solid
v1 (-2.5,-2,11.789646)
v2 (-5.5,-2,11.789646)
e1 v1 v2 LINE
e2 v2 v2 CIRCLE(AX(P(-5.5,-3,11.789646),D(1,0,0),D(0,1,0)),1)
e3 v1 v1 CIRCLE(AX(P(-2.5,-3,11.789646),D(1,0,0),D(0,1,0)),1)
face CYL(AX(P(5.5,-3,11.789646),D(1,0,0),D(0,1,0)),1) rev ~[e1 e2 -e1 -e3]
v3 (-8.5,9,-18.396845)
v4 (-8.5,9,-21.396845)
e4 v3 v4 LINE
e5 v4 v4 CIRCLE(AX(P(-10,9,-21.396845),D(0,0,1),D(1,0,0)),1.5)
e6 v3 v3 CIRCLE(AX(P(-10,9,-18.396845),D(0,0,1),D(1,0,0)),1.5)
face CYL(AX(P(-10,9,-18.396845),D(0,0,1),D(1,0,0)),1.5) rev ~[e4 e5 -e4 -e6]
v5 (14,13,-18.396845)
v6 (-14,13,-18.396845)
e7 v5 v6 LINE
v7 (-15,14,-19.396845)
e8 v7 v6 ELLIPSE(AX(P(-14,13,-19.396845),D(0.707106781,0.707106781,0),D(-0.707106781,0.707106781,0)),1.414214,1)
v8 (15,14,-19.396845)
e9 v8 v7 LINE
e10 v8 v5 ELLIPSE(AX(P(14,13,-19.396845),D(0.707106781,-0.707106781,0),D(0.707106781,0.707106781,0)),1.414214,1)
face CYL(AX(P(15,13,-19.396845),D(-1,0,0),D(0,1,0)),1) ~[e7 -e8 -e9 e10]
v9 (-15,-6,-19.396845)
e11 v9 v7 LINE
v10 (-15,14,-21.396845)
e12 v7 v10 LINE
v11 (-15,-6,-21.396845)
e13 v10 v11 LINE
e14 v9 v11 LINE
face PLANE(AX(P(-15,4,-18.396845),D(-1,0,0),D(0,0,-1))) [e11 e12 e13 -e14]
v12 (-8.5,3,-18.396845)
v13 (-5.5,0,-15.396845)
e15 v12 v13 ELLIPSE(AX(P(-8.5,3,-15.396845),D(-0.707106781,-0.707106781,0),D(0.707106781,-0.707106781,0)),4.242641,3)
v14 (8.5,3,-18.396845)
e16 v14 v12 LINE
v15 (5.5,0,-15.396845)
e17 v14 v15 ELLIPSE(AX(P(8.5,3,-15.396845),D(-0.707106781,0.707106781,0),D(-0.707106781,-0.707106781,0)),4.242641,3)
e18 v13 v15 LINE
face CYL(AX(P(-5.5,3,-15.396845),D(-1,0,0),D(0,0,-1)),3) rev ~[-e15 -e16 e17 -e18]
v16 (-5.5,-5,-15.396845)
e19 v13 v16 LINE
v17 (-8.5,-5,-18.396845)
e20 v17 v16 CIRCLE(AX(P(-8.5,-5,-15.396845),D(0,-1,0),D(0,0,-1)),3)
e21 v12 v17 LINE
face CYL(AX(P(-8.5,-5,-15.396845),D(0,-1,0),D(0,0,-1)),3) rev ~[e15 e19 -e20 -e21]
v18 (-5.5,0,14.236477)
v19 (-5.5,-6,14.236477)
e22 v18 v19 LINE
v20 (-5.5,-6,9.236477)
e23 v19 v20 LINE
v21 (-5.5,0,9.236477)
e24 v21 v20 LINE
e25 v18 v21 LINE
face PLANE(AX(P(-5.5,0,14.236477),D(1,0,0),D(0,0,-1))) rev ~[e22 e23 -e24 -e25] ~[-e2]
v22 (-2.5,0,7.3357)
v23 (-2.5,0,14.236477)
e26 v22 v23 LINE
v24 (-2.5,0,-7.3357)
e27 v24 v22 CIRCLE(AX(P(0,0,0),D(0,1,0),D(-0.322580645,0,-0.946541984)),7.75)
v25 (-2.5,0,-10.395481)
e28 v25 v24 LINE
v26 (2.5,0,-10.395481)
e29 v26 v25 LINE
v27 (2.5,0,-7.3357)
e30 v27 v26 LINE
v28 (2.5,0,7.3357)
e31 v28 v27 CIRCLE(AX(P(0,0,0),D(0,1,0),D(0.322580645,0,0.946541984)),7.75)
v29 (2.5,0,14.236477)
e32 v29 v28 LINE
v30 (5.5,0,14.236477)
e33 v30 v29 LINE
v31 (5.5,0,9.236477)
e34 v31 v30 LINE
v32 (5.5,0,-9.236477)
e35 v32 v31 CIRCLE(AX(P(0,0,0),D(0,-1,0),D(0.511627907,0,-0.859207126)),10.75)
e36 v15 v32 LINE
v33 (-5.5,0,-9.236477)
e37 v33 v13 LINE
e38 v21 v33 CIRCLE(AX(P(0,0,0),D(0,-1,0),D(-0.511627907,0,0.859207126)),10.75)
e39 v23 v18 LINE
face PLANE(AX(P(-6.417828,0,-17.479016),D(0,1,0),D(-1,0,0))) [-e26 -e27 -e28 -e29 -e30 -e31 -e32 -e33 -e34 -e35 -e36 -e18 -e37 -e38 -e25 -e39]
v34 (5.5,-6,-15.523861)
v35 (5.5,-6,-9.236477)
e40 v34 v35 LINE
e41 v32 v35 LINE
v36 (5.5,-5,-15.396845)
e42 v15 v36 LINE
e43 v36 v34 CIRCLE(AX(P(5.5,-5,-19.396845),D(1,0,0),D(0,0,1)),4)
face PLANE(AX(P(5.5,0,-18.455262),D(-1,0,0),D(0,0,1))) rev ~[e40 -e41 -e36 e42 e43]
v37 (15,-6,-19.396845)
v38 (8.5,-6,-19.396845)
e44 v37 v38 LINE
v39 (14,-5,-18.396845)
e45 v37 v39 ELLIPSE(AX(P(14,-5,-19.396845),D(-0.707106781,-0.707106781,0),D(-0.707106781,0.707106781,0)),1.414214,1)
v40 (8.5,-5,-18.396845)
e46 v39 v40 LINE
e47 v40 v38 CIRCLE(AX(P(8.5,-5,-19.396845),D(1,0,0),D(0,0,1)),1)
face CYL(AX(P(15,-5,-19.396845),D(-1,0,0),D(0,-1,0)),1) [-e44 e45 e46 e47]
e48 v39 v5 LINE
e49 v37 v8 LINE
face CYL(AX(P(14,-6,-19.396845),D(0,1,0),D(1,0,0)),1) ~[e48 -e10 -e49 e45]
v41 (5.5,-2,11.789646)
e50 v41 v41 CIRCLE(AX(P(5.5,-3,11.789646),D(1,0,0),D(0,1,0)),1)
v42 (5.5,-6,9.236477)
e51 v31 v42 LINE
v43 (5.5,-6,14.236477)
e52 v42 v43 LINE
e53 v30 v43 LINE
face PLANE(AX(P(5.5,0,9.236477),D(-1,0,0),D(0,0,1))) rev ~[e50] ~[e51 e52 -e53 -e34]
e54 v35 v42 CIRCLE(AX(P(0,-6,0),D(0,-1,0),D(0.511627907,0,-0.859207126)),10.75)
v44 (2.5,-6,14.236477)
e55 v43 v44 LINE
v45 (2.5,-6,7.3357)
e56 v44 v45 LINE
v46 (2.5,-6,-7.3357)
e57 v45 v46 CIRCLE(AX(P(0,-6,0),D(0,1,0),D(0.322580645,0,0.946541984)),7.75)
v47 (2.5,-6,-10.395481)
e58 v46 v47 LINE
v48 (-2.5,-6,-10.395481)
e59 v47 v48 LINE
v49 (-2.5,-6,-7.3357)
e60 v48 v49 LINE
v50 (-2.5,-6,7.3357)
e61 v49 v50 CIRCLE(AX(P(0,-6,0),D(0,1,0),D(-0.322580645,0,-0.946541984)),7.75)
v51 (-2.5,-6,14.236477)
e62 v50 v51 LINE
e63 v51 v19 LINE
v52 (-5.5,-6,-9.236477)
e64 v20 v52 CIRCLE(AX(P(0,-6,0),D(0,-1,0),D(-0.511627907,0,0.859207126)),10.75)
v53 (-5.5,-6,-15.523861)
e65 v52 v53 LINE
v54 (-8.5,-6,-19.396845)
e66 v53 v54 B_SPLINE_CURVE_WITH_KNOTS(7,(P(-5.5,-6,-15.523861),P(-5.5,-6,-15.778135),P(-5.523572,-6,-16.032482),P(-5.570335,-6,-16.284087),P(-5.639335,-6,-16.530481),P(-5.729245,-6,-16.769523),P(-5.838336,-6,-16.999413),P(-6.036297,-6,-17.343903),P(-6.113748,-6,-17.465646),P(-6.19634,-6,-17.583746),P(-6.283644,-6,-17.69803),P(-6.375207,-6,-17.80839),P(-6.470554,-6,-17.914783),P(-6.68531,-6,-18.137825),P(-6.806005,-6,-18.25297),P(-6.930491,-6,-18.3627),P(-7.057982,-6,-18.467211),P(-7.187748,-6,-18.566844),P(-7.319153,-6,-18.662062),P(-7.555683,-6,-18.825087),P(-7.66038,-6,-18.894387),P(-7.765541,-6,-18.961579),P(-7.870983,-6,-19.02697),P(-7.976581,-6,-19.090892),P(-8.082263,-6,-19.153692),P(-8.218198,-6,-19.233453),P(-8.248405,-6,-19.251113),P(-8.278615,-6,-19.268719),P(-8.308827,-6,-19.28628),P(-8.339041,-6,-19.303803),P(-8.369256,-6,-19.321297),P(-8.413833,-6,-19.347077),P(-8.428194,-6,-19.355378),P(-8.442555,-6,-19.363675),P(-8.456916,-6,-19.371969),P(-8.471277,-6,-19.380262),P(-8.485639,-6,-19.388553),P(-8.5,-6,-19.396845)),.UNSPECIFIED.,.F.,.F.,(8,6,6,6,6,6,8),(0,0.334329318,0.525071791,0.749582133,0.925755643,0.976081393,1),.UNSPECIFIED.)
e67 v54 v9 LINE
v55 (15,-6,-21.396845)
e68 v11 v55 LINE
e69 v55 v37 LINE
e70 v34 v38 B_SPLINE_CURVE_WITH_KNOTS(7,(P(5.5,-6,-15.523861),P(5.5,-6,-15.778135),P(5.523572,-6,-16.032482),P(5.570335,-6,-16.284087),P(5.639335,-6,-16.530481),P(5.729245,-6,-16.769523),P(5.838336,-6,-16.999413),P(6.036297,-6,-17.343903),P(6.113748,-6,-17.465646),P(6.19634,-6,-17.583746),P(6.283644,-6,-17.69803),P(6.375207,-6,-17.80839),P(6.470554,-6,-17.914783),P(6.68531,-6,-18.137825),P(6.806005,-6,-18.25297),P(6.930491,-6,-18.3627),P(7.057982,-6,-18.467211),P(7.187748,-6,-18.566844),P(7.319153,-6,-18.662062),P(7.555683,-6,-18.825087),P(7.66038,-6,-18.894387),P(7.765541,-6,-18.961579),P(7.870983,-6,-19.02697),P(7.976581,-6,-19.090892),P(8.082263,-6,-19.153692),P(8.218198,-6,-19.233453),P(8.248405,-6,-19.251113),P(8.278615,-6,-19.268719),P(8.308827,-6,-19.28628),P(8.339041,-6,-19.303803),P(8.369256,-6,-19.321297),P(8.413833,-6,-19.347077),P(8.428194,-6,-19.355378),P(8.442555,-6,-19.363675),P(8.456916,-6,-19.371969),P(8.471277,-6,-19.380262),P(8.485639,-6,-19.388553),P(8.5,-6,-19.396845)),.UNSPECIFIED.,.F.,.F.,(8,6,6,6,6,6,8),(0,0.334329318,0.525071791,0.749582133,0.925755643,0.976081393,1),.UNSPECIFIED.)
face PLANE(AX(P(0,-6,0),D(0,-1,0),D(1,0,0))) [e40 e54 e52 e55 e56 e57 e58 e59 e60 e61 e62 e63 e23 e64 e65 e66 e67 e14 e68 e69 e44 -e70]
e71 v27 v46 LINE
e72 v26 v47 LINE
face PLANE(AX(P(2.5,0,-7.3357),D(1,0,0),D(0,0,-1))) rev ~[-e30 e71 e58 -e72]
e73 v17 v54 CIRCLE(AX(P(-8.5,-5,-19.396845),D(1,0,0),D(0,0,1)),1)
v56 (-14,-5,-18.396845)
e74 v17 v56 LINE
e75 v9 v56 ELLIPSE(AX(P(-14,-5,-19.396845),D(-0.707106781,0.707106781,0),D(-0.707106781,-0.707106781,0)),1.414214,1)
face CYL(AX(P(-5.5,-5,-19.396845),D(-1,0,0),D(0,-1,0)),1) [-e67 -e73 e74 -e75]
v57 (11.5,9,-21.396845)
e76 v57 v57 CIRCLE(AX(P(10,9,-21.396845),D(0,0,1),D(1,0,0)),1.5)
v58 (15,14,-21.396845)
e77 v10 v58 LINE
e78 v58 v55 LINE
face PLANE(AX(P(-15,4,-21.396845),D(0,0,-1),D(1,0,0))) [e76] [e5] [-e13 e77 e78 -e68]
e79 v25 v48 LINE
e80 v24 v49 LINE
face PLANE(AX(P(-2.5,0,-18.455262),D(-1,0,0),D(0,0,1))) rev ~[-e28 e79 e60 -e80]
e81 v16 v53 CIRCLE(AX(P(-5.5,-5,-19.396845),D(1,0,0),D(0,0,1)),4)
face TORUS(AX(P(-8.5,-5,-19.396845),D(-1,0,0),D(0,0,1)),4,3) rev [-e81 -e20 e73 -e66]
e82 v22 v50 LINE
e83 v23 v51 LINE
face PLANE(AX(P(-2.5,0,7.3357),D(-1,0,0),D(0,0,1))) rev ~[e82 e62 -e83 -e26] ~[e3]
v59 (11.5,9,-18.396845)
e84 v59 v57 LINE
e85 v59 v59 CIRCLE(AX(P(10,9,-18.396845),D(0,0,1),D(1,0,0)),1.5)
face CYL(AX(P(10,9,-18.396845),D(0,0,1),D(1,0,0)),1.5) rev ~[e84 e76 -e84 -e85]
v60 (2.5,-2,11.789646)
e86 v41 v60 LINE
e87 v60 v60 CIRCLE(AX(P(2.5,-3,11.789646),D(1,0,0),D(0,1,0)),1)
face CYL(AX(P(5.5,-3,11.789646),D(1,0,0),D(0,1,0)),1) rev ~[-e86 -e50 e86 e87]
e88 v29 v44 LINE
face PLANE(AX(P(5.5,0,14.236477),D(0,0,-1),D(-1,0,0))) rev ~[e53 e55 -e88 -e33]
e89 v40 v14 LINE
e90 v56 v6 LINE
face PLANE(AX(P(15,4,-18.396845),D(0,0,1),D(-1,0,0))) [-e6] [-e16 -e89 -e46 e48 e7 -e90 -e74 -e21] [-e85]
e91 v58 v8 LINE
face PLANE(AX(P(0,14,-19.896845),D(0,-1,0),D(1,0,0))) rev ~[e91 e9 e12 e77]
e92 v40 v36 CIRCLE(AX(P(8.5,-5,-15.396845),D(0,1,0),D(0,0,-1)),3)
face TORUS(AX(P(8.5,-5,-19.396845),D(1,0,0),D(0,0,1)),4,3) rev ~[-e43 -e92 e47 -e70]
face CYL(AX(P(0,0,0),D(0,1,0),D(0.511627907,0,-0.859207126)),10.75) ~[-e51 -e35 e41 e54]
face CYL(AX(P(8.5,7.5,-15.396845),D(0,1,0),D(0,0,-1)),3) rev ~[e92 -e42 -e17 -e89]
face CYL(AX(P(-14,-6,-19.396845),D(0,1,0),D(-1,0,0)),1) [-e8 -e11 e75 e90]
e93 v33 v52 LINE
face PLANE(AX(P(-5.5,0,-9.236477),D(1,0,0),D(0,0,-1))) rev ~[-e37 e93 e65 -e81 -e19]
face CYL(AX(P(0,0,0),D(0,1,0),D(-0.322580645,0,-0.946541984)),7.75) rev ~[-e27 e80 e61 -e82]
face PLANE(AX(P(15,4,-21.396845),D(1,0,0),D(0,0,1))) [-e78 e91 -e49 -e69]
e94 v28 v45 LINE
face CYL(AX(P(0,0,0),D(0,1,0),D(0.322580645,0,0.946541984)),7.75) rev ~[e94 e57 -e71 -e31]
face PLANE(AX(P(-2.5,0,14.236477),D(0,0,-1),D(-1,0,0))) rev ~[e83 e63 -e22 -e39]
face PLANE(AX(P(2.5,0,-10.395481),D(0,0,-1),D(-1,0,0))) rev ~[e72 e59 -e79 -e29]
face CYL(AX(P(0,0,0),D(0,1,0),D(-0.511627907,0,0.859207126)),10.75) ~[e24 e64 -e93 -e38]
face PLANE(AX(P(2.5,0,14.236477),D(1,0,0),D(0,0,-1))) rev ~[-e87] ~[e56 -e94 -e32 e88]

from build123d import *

# Parameters (mm, degrees)
F1_DEPTH      = 6
F2_R          = 1
F3_DEPTH      = 25
F5_DEPTH      = 6
F6_DEPTH      = 10
F11_R         = 1
F12_T1_DEPTH  = 5
F12_T3_DEPTH  = 11
F12_T8_ANGLE  = 359.64
F12_T14_ANGLE = 359.64
F12_T21_DEPTH = 12.5
F12_T25_DEPTH = 18.5
F12_T32_DEPTH = 18.5
F12_T36_DEPTH = 12.5
F13_R         = 1.5
F14_DEPTH     = 25


# Not quite as in the source:
# - a fillet or chamfer that OpenCascade refuses, or shapes differently, is made with other operations: its cross-section is extruded or revolved along the edge and cut away or added


with BuildPart() as f1:
    # F0 (on Front) → F1 (new body)
    with BuildSketch(Plane.XZ):
        with BuildLine():
            Line((2.5, -7.3357003756), (2.5, -18.4552618332))
            Line((2.5, -18.4552618332), (5.5, -18.4552618332))
            Line((5.5, -18.4552618332), (5.5, -9.236476601))
            ThreePointArc((5.5, -9.236476601), (10.75, 0), (5.5, 9.236476601))
            Line((5.5, 9.236476601), (5.5, 14.236476601))
            Line((5.5, 14.236476601), (2.5, 14.236476601))
            Line((2.5, 14.236476601), (2.5, 7.3357003756))
            ThreePointArc((2.5, 7.3357003756), (7.75, 0), (2.5, -7.3357003756))
        make_face()
    extrude(amount=F1_DEPTH)


with BuildPart() as f1b:
    # F0 (on Front) → F1, piece 2 (new body)
    with BuildSketch(Plane.XZ):
        with BuildLine():
            ThreePointArc((-2.5, -7.3357003756), (-7.75, 0), (-2.5, 7.3357003756))
            Line((-2.5, 7.3357003756), (-2.5, 14.236476601))
            Line((-2.5, 14.236476601), (-5.5, 14.236476601))
            Line((-5.5, 14.236476601), (-5.5, 9.236476601))
            ThreePointArc((-5.5, 9.236476601), (-10.75, 0), (-5.5, -9.236476601))
            Line((-5.5, -9.236476601), (-5.5, -18.4552618332))
            Line((-5.5, -18.4552618332), (-2.5, -18.4552618332))
            Line((-2.5, -18.4552618332), (-2.5, -7.3357003756))
        make_face()
    extrude(amount=F1_DEPTH)


with BuildPart() as f3_tool:
    # F2 (on face) → F3 (new body)
    with BuildSketch(Plane.YZ.offset(5.5)):
        with Locations((-3, 11.7896459997)):
            Circle(F2_R)
    extrude(amount=-F3_DEPTH)


with BuildPart() as f1_1:
    add(f1.part)

    # F3: cut by f3_tool
    add(f3_tool.part, mode=Mode.SUBTRACT)


with BuildPart() as f1b_1:
    add(f1b.part)

    # F3: cut by f3_tool
    add(f3_tool.part, mode=Mode.SUBTRACT)


with BuildPart() as f5:
    # F4 (on Front) → F5 (new body)
    with BuildSketch(Plane.XZ):
        Polygon((2.5, -12.8954811044), (-2.5, -12.8954811044), (-2.5, -18.4552618332), (-2.5, -20.8968445659), (2.5, -20.8968445659), (2.5, -18.4552618332), align=None)
    extrude(amount=F5_DEPTH)


with BuildPart() as f6:
    # F4 (on Front) → F6 (new body, symmetric)
    with BuildSketch(Plane.XZ):
        Polygon((2.5, -20.8968445659), (-2.5, -20.8968445659), (-15, -20.8968445659), (-15, -23.8968445659), (15, -23.8968445659), (15, -20.8968445659), align=None)
    extrude(amount=F6_DEPTH, both=True)


with BuildPart() as f6_1:
    # F7: moved
    add(f6.part.moved(Location((0, 0, 2.5))))


with BuildPart() as f5_1:
    # F7: moved
    add(f5.part.moved(Location((0, 0, 2.5))))


with BuildPart() as f6_2:
    # F8: moved
    add(f6_1.part.moved(Location((0, 4, 0))))


with BuildPart() as f5_2:
    add(f5_1.part)

    # F9: union F6
    add(f6_2.part)

    # F10: union F1, F1b
    add(f1_1.part)
    add(f1b_1.part)

    # F11
    f11_edges = [f5_2.edges().sort_by_distance(p)[0] for p in [
        (-10.25, -6, -18.396845),
        (10.25, -6, -18.396845),
        (15, 4, -18.396845),
        (0, 14, -18.396845),
        (-15, 4, -18.396845),
    ]]
    fillet(f11_edges, radius=F11_R)

    # F12: fillet of radius 3 on 7 edges, made by hand

    # F12_s2 → F12_t1 (join)
    with BuildSketch(Plane.XZ):
        with BuildLine():
            ThreePointArc((-8.5, -18.3968445659), (-6.3786796564, -17.5181649094), (-5.5, -15.3968445659))
            Line((-5.5, -15.3968445659), (-5.5, -18.3968445659))
            Line((-5.5, -18.3968445659), (-8.5, -18.3968445659))
        make_face()
        with BuildLine():
            ThreePointArc((8.5, -18.3968445659), (6.3786796564, -17.5181649094), (5.5, -15.3968445659))
            Line((5.5, -15.3968445659), (5.5, -18.3968445659))
            Line((5.5, -18.3968445659), (8.5, -18.3968445659))
        make_face()
    extrude(amount=F12_T1_DEPTH)

    # F12_s4 → F12_t3 (join)
    with BuildSketch(Plane.YZ.offset(-5.5)):
        with BuildLine():
            ThreePointArc((3, -18.3968445659), (0.8786796564, -17.5181649094), (0, -15.3968445659))
            Line((0, -15.3968445659), (0, -18.3968445659))
            Line((0, -18.3968445659), (3, -18.3968445659))
        make_face()
    extrude(amount=F12_T3_DEPTH)


with BuildPart() as f12_tool6:
    # F12_s7 → F12_t8 (revolve)
    with BuildSketch(Plane.XZ.offset(5)):
        with BuildLine():
            ThreePointArc((-8.5, -18.3968445659), (-6.3786796564, -17.5181649094), (-5.5, -15.3968445659))
            Line((-5.5, -15.3968445659), (-5.5, -18.3968445659))
            Line((-5.5, -18.3968445659), (-8.5, -18.3968445659))
        make_face()
    revolve(axis=Axis((-5.5, -5, -19.3968445659), (1, 0, 0)), revolution_arc=F12_T8_ANGLE)

    split(bisect_by=Plane.XZ.offset(6), keep=Keep.BOTTOM)

    split(bisect_by=Plane.XY.offset(-21.3968445659), keep=Keep.TOP)


with BuildPart() as f5_3:
    add(f5_2.part)

    # F12_t5: union F12_tool6
    add(f12_tool6.part)


with BuildPart() as f12_tool12:
    # F12_s13 → F12_t14 (revolve)
    with BuildSketch(Plane.XZ.offset(5)):
        with BuildLine():
            ThreePointArc((8.5, -18.3968445659), (6.3786796564, -17.5181649094), (5.5, -15.3968445659))
            Line((5.5, -15.3968445659), (5.5, -18.3968445659))
            Line((5.5, -18.3968445659), (8.5, -18.3968445659))
        make_face()
    revolve(axis=Axis((5.5, -5, -19.3968445659), (1, 0, 0)), revolution_arc=F12_T14_ANGLE)

    split(bisect_by=Plane.XZ.offset(6), keep=Keep.BOTTOM)

    split(bisect_by=Plane.XY.offset(-21.3968445659), keep=Keep.TOP)


with BuildPart() as f5_4:
    add(f5_3.part)

    # F12_t11: union F12_tool12
    add(f12_tool12.part)


with BuildPart() as f12_tool19:
    # F12_s20 → F12_t21 (new body)
    with BuildSketch(Plane.XZ.offset(5)):
        with BuildLine():
            ThreePointArc((-8.5, -18.3968445659), (-6.3786796564, -17.5181649094), (-5.5, -15.3968445659))
            Line((-5.5, -15.3968445659), (-5.5, -18.3968445659))
            Line((-5.5, -18.3968445659), (-8.5, -18.3968445659))
        make_face()
    extrude(amount=-F12_T21_DEPTH)

    split(bisect_by=Plane.XZ, keep=Keep.BOTTOM)


with BuildPart() as f12_tool23:
    # F12_s24 → F12_t25 (new body)
    with BuildSketch(Plane.YZ.offset(-13)):
        with BuildLine():
            ThreePointArc((3, -18.3968445659), (0.8786796564, -17.5181649094), (0, -15.3968445659))
            Line((0, -15.3968445659), (0, -18.3968445659))
            Line((0, -18.3968445659), (3, -18.3968445659))
        make_face()
    extrude(amount=F12_T25_DEPTH)

    split(bisect_by=Plane.YZ.offset(-5.5), keep=Keep.BOTTOM)


with BuildPart() as f12_tool19_1:
    add(f12_tool19.part)

    # F12_t27: intersect F12_tool23
    add(f12_tool23.part, mode=Mode.INTERSECT)


with BuildPart() as f5_5:
    add(f5_4.part)

    # F12_t17: union F12_tool19
    add(f12_tool19_1.part)


with BuildPart() as f12_tool30:
    # F12_s31 → F12_t32 (new body)
    with BuildSketch(Plane.YZ.offset(-5.5)):
        with BuildLine():
            ThreePointArc((3, -18.3968445659), (0.8786796564, -17.5181649094), (0, -15.3968445659))
            Line((0, -15.3968445659), (0, -18.3968445659))
            Line((0, -18.3968445659), (3, -18.3968445659))
        make_face()
    extrude(amount=F12_T32_DEPTH)

    split(bisect_by=Plane.YZ.offset(5.5), keep=Keep.TOP)


with BuildPart() as f12_tool34:
    # F12_s35 → F12_t36 (new body)
    with BuildSketch(Plane.XZ.offset(-7.5)):
        with BuildLine():
            ThreePointArc((8.5, -18.3968445659), (6.3786796564, -17.5181649094), (5.5, -15.3968445659))
            Line((5.5, -15.3968445659), (5.5, -18.3968445659))
            Line((5.5, -18.3968445659), (8.5, -18.3968445659))
        make_face()
    extrude(amount=F12_T36_DEPTH)

    split(bisect_by=Plane.XZ, keep=Keep.BOTTOM)


with BuildPart() as f12_tool30_1:
    add(f12_tool30.part)

    # F12_t38: intersect F12_tool34
    add(f12_tool34.part, mode=Mode.INTERSECT)


with BuildPart() as f5_6:
    add(f5_5.part)

    # F12_t28: union F12_tool30
    add(f12_tool30_1.part)

    # F13 (on face) → F14 (cut)
    with BuildSketch(Plane.XY.offset(-18.3968445659)):
        with Locations((-10, 9)):
            Circle(F13_R)
        with Locations((10, 9)):
            Circle(F13_R)
    extrude(amount=-F14_DEPTH, mode=Mode.SUBTRACT)


solid = f5_6.part
